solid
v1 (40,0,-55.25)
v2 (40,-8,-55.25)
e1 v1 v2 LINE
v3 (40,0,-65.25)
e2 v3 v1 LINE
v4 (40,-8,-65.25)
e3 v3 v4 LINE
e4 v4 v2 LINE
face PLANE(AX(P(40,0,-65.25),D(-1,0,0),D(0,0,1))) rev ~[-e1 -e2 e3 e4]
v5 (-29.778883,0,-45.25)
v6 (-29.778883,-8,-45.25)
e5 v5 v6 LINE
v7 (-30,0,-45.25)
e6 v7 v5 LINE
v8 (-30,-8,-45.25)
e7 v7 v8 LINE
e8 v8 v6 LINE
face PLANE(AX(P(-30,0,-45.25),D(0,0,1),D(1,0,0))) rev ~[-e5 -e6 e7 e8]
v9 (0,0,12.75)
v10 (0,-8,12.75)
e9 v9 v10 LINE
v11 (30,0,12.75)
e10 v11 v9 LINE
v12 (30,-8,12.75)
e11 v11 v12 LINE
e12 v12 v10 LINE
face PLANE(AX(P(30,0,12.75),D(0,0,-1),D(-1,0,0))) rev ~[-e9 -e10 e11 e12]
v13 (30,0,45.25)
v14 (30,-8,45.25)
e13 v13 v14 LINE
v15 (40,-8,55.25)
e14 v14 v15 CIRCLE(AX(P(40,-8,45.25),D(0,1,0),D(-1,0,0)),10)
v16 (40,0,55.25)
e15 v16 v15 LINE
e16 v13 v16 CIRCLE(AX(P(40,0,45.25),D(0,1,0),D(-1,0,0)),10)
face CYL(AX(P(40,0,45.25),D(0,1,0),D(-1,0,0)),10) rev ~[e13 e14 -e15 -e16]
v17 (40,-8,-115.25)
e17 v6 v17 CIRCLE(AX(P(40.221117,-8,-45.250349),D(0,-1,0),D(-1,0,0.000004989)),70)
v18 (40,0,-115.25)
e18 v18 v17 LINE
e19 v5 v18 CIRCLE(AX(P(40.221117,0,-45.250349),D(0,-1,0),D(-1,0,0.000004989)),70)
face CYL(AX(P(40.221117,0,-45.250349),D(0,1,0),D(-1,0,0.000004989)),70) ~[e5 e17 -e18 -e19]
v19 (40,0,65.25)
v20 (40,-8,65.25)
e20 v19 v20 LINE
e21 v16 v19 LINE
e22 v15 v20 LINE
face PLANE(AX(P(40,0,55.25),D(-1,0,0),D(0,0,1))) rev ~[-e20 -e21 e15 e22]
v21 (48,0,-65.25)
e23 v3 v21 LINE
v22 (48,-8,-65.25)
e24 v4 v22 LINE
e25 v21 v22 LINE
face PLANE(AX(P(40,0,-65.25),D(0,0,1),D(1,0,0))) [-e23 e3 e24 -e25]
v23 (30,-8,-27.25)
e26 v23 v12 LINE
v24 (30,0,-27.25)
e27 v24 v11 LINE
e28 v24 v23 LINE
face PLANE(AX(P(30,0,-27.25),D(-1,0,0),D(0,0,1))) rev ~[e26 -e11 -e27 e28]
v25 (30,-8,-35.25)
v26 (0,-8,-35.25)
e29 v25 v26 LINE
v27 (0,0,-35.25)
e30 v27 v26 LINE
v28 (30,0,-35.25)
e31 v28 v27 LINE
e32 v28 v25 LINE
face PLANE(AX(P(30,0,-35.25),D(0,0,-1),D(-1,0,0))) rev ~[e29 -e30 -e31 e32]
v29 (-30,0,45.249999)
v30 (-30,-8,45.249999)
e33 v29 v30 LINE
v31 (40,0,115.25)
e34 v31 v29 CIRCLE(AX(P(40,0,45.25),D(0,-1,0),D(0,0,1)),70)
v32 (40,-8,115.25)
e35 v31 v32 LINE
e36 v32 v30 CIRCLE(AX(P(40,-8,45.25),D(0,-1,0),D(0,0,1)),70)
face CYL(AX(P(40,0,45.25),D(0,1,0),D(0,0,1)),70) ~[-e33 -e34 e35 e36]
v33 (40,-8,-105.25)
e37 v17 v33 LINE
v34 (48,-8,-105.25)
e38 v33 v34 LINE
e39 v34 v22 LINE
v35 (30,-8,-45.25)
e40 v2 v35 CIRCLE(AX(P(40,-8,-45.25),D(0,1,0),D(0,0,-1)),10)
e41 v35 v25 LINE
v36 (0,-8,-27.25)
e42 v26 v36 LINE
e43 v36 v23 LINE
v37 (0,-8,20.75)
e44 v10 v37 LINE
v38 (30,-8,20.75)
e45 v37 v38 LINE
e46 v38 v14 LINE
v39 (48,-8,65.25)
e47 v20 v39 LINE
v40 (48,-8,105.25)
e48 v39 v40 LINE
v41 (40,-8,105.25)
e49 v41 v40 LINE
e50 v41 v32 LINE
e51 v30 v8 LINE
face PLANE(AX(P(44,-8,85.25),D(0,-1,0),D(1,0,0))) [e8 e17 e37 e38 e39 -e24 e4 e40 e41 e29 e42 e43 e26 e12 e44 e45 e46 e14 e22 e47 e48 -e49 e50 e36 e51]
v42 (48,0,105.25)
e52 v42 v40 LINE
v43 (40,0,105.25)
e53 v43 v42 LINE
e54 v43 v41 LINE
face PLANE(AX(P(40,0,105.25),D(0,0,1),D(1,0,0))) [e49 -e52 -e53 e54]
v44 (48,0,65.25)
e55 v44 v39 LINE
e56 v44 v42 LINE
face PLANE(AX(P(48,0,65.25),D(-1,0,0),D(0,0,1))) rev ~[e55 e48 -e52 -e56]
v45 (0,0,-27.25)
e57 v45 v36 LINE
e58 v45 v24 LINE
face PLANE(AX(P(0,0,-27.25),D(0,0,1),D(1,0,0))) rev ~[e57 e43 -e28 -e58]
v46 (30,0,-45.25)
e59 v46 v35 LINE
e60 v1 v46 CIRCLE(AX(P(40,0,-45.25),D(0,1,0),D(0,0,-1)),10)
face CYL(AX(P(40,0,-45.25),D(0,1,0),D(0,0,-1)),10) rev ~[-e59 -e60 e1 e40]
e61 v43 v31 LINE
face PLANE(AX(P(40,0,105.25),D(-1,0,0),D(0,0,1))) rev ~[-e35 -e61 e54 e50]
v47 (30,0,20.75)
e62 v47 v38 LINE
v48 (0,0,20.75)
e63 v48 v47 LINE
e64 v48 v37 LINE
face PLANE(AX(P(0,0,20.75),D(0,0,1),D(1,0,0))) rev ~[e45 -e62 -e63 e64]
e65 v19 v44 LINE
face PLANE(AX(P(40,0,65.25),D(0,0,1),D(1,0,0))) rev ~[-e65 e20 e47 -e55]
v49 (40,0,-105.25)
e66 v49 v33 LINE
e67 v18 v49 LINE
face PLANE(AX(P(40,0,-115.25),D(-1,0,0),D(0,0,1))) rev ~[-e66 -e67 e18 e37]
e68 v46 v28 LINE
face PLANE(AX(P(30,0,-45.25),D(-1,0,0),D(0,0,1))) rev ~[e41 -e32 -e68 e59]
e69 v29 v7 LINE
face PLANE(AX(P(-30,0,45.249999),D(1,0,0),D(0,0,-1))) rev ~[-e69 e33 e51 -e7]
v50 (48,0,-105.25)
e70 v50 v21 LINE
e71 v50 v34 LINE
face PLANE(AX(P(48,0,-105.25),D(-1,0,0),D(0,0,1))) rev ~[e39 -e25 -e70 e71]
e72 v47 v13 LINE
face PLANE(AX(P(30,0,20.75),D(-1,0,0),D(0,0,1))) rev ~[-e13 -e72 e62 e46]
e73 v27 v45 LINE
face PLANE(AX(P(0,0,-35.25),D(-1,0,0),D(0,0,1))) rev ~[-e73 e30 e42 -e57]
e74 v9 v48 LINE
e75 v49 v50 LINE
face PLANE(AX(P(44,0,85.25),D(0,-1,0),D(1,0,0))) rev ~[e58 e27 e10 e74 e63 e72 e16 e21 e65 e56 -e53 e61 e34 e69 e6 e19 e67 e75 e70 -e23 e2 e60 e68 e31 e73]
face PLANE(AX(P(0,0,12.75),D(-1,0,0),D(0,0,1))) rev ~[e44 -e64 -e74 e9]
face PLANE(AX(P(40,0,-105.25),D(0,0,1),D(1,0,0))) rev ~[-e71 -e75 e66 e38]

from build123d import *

# Parameters (mm, degrees)
F0_W     = 8
F0_H     = 40
F1_DEPTH = 8


# Not quite as in the source:
# - ends of sketch curves that miss each other by under 0.0002 mm in the source are joined


with BuildPart() as f1:
    # F0 (on Front) → F1 (new body)
    with BuildSketch(Plane.XZ):
        with Locations((44, 85.25)):
            Rectangle(F0_W, F0_H)
        with Locations((44, -85.25)):
            Rectangle(F0_W, F0_H)
        with BuildLine():
            Line((30, -45.25), (-29.7788833363, -45.25))
            ThreePointArc((-29.7788833363, -45.25), (-9.3545962046, -94.6694618691), (40, -115.25))
            Line((40, -115.25), (40, -105.25))
            Line((40, -105.25), (40, -65.25))
            Line((40, -65.25), (40, -55.25))
            ThreePointArc((40, -55.25), (32.9289321881, -52.3210678119), (30, -45.25))
        make_face()
        with BuildLine():
            ThreePointArc((40, 115.25), (-9.4974751888, 94.7474741773), (-30, 45.2499985695))
            Line((-30, 45.2499985695), (30, 45.25))
            ThreePointArc((30, 45.25), (32.9289321881, 52.3210678119), (40, 55.25))
            Line((40, 55.25), (40, 65.25))
            Line((40, 65.25), (40, 105.25))
            Line((40, 105.25), (40, 115.25))
        make_face()
        Polygon((-30, 45.25), (-30, -45.25), (-29.7788833363, -45.25), (30, -45.25), (30, -35.25), (0, -35.25), (0, -27.25), (30, -27.25), (30, 12.75), (0, 12.75), (0, 20.75), (30, 20.75), (30, 45.25), align=None)
    extrude(amount=F1_DEPTH)


solid = f1.part
